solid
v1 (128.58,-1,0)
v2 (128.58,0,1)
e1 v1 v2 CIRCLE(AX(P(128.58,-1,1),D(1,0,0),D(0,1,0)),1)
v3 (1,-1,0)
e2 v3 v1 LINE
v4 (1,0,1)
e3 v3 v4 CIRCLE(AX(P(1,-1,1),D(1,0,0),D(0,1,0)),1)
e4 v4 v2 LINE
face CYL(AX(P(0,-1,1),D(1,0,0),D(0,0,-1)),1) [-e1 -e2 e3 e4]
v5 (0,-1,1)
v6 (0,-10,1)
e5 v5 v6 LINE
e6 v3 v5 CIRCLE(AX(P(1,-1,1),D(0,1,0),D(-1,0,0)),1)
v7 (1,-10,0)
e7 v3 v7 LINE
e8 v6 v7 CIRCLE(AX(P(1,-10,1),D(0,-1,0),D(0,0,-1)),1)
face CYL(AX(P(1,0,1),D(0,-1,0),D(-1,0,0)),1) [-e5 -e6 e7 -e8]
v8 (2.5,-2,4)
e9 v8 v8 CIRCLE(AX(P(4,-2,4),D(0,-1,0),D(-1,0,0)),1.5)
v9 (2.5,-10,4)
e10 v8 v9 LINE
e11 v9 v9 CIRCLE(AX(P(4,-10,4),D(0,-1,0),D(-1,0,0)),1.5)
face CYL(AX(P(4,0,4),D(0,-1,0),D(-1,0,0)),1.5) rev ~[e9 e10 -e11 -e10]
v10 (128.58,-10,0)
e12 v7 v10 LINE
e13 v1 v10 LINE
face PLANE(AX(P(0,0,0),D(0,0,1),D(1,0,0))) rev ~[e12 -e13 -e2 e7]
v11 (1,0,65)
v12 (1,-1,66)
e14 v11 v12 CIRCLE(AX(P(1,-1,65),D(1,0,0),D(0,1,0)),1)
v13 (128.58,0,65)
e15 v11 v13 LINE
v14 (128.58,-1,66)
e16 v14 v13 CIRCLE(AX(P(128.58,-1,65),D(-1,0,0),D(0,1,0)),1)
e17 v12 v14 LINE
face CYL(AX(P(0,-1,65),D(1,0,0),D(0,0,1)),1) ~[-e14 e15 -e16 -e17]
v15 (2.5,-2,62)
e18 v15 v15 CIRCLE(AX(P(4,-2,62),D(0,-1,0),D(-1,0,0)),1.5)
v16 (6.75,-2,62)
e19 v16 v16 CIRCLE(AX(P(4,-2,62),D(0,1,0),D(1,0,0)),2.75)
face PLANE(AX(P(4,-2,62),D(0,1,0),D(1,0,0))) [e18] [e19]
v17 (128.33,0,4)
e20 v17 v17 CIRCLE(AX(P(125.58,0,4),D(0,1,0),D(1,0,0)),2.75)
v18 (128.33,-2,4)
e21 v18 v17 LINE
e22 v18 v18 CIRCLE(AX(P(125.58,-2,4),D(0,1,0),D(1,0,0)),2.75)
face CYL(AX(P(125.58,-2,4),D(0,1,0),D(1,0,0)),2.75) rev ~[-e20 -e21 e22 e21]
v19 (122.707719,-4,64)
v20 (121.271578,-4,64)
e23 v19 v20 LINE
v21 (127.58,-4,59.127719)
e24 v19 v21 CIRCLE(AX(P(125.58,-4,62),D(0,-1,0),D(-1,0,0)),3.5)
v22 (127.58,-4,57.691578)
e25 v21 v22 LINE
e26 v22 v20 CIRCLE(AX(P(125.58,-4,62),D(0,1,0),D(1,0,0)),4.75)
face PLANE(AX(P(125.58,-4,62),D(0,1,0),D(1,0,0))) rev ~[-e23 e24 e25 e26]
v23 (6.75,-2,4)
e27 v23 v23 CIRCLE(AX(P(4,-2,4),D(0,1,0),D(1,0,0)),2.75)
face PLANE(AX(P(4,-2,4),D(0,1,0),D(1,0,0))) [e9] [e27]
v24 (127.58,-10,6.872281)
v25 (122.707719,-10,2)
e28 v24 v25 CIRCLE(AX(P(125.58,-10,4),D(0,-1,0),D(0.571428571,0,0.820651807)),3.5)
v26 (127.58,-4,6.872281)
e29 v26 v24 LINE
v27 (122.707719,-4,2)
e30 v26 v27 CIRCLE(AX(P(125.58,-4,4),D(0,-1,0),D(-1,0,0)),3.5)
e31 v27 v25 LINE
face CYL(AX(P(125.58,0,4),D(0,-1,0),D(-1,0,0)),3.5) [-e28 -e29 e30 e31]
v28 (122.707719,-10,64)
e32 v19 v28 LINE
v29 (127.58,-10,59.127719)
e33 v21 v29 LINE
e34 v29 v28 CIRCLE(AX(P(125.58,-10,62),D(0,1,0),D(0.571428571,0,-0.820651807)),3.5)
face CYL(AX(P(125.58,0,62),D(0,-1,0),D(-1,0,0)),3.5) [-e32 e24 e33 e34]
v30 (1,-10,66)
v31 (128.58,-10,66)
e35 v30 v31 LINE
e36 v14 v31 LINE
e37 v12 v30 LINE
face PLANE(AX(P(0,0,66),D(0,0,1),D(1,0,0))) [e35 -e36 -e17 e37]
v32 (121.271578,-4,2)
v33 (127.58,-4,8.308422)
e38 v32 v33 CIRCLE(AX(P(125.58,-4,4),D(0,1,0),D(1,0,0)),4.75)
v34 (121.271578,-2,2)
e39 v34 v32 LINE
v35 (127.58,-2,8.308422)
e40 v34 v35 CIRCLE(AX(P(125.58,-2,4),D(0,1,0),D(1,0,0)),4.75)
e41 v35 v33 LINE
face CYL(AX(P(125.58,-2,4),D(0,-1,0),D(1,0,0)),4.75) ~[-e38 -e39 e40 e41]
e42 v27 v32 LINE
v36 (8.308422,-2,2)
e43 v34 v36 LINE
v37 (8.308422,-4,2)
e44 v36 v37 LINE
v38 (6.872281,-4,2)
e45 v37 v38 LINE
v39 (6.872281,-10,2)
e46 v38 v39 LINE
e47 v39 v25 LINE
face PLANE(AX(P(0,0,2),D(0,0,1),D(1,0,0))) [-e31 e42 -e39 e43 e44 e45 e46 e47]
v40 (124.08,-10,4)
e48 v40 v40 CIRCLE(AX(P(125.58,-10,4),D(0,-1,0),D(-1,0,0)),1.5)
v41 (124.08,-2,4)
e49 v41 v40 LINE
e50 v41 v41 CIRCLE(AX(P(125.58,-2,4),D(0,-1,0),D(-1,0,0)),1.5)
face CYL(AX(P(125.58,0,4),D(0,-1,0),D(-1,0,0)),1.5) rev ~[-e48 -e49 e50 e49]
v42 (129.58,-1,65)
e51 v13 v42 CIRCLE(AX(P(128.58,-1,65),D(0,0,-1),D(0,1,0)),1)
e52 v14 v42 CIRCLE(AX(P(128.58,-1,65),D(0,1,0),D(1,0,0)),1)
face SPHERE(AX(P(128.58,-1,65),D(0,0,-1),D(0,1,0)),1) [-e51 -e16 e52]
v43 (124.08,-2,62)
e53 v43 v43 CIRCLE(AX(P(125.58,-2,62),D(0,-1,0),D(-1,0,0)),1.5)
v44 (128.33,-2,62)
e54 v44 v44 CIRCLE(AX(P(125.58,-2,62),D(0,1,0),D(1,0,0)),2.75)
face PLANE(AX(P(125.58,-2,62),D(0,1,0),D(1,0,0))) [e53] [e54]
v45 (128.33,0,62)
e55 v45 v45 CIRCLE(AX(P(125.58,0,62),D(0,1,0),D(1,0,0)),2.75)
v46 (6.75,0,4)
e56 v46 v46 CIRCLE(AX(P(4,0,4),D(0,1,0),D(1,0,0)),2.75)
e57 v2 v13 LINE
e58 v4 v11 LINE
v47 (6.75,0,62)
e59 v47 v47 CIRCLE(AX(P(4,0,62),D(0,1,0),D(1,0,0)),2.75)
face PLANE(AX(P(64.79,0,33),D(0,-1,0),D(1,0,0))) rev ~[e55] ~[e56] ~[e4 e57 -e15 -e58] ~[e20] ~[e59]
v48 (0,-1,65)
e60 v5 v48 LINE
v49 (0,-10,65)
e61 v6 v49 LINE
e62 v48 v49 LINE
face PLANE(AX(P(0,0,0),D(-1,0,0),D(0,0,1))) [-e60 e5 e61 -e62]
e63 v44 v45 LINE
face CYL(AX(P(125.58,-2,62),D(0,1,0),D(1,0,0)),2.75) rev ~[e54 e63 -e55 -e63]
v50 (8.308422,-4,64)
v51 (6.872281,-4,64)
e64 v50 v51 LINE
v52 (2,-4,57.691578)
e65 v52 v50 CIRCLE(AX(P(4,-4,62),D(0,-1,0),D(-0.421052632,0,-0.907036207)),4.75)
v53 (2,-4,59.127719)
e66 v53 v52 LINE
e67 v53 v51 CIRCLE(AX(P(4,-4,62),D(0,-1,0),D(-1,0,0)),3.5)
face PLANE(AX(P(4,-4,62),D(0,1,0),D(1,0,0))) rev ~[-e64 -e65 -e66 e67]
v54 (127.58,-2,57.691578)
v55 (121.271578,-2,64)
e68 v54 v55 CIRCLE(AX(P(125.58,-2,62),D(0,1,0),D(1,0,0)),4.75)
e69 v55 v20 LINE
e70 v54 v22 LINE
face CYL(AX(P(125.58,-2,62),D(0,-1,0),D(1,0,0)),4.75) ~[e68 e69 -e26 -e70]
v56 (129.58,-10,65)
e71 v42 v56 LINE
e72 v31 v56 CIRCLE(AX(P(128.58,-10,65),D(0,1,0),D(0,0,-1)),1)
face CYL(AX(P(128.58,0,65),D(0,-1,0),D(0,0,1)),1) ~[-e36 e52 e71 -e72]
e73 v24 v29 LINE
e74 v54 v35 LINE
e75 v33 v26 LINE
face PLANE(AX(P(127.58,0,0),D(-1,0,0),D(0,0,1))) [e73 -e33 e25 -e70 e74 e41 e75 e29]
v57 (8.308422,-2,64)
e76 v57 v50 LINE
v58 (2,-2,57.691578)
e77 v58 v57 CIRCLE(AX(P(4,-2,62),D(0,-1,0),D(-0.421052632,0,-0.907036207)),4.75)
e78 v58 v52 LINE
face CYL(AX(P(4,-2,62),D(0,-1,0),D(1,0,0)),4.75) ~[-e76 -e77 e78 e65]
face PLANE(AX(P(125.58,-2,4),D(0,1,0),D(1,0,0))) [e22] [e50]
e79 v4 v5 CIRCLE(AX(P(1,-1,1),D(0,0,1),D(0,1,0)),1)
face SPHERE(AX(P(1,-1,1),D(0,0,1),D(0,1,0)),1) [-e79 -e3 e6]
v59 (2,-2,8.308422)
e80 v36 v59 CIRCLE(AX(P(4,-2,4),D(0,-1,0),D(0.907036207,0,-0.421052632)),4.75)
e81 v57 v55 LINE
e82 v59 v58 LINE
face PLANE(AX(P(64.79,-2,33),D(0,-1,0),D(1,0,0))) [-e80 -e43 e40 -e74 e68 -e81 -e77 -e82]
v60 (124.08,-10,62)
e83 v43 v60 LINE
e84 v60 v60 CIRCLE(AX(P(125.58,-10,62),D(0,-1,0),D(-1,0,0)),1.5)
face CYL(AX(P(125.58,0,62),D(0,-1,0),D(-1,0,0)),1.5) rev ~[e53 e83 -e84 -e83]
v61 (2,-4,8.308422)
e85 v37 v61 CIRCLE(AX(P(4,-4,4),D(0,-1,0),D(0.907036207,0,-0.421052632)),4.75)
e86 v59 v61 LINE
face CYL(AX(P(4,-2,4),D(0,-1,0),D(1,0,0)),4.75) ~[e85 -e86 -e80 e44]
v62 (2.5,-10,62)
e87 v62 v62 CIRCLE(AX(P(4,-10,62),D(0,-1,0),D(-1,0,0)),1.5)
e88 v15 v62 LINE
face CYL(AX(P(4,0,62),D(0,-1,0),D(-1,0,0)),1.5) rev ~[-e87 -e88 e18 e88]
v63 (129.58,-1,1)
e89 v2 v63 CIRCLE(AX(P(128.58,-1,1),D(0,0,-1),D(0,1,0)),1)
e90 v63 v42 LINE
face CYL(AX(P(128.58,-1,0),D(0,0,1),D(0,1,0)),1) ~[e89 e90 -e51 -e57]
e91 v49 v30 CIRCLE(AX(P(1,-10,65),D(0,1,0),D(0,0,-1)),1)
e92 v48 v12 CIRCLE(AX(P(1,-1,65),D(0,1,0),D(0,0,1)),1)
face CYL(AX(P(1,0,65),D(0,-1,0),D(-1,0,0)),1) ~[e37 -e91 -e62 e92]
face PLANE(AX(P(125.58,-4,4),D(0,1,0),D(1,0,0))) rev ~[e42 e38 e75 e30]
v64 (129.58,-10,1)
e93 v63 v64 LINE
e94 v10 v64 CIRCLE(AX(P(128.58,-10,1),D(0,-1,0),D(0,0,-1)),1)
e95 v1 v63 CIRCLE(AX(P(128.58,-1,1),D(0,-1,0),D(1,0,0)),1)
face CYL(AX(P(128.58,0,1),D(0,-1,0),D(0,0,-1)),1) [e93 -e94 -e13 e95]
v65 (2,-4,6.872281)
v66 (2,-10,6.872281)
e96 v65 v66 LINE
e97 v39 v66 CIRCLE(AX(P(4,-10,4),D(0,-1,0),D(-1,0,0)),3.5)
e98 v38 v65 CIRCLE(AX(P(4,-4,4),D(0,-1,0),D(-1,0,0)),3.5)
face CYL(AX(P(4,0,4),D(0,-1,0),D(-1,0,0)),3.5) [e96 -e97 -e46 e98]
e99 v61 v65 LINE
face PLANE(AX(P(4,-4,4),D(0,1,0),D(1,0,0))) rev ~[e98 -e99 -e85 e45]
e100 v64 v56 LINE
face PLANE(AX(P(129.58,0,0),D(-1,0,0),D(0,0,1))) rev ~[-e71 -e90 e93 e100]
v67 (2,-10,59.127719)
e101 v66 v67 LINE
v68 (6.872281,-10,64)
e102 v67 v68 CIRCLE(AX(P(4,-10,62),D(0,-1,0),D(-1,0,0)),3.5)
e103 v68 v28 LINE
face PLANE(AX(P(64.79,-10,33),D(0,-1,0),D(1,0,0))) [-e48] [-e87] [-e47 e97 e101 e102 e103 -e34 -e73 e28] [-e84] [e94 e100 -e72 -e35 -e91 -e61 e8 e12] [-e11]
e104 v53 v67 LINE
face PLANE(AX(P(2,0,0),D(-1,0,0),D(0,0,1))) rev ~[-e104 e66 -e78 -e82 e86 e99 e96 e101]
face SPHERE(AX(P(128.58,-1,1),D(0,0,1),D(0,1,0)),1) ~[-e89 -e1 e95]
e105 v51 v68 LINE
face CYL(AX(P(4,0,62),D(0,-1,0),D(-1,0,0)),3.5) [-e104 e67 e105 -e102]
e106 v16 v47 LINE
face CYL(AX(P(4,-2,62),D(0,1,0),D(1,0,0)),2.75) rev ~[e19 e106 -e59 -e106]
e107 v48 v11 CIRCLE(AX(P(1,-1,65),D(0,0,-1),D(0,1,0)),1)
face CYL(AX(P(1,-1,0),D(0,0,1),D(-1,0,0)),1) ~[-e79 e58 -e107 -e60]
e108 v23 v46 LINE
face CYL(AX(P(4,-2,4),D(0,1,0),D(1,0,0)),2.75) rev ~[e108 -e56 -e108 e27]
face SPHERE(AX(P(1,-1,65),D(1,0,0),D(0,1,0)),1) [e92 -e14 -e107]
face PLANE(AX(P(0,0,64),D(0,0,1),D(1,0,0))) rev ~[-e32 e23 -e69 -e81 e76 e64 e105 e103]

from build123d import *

# Parameters (mm, degrees)
F0_W           = 129.58
F0_H           = 66
F1_DEPTH       = 10
F3_D           = 3
F3_DEPTH       = 11
F3_CBORE_D     = 5.5
F3_CBORE_DEPTH = 2
F3_TIP         = 0.9012909285
F4_T           = 2
F5_R           = 1


# Not quite as in the source:
# - a shell that OpenCascade refuses in one call is made with other operations: the cavity is built on its own and cut out


with BuildPart() as f1:
    # F0 (on Front) → F1 (new body)
    with BuildSketch(Plane.XZ):
        with Locations((64.79, 33)):
            Rectangle(F0_W, F0_H)
    extrude(amount=F1_DEPTH)

    # F3
    with Locations(Plane(origin=(0, 0, 0), x_dir=(1, 0, 0), z_dir=(0, 1, 0))):
        with Locations((4, -62), (4, -4), (125.58, -4), (125.58, -62)):
            CounterBoreHole(F3_D / 2, F3_CBORE_D / 2, F3_CBORE_DEPTH, depth=F3_DEPTH)
            with Locations((0, 0, -(F3_DEPTH + F3_TIP / 2))):  # 118° drill point
                Cone(0, F3_D / 2, F3_TIP, mode=Mode.SUBTRACT)

    # F4: shell of thickness 2, made by hand


with BuildPart() as f4_core1:
    # F4_t2: copy of F1
    add(f1.part)

    # the walls: a layer under each face that stays
    f4_faces = [f4_core1.faces().sort_by_distance(p)[0] for p in [
        (0, -5, 33),
        (64.79, -5, 66),
        (64.79, -5, 0),
        (64.79, 0, 33),
        (129.58, -5, 33),
        (1.25, -1, 4),
        (122.83, -1, 4),
        (1.25, -1, 62),
        (122.83, -1, 62),
        (2.5, -6, 4),
        (124.08, -6, 4),
        (2.5, -6, 62),
        (124.08, -6, 62),
        (2.1666666667, -2, 5.8333333333),
        (123.7466666667, -2, 5.8333333333),
        (2.1666666667, -2, 63.8333333333),
        (123.7466666667, -2, 63.8333333333),
    ]]
    thicken(f4_faces, amount=-F4_T, mode=Mode.SUBTRACT)

    # F4_s3 → F4_t4 (revolve, cut)
    with BuildSketch(Plane.XY.offset(4)):
        Polygon((6.73, -1.98), (8.75, -2), (8.75, -4), (6.75, -4), align=None)
    revolve(axis=Axis((4, -2, 4), (0, 1, 0)), mode=Mode.SUBTRACT)

    # F4_s5 → F4_t6 (revolve, cut)
    with BuildSketch(Plane.XY.offset(4)):
        Polygon((128.31, -1.98), (130.33, -2), (130.33, -4), (128.33, -4), align=None)
    revolve(axis=Axis((125.58, -2, 4), (0, 1, 0)), mode=Mode.SUBTRACT)

    # F4_s7 → F4_t8 (revolve, cut)
    with BuildSketch(Plane.XY.offset(62)):
        Polygon((6.73, -1.98), (8.75, -2), (8.75, -4), (6.75, -4), align=None)
    revolve(axis=Axis((4, -2, 62), (0, 1, 0)), mode=Mode.SUBTRACT)

    # F4_s9 → F4_t10 (revolve, cut)
    with BuildSketch(Plane.XY.offset(62)):
        Polygon((128.31, -1.98), (130.33, -2), (130.33, -4), (128.33, -4), align=None)
    revolve(axis=Axis((125.58, -2, 62), (0, 1, 0)), mode=Mode.SUBTRACT)


with BuildPart() as f1_1:
    add(f1.part)

    # what is left inside the walls is the cavity
    f4_cavity = [f4_core1.part.solids().sort_by_distance(p)[0] for p in [
        (64.79, -9.98, 22.666667),
    ]]
    add(f4_cavity, mode=Mode.SUBTRACT)

    # F5
    f5_edges = [f1_1.edges().sort_by_distance(p)[0] for p in [
        (129.58, 0, 33),
        (64.79, 0, 66),
        (0, 0, 33),
        (64.79, 0, 0),
        (129.58, -5, 66),
        (129.58, -5, 0),
        (0, -5, 0),
        (0, -5, 66),
    ]]
    fillet(f5_edges, radius=F5_R)


solid = f1_1.part
